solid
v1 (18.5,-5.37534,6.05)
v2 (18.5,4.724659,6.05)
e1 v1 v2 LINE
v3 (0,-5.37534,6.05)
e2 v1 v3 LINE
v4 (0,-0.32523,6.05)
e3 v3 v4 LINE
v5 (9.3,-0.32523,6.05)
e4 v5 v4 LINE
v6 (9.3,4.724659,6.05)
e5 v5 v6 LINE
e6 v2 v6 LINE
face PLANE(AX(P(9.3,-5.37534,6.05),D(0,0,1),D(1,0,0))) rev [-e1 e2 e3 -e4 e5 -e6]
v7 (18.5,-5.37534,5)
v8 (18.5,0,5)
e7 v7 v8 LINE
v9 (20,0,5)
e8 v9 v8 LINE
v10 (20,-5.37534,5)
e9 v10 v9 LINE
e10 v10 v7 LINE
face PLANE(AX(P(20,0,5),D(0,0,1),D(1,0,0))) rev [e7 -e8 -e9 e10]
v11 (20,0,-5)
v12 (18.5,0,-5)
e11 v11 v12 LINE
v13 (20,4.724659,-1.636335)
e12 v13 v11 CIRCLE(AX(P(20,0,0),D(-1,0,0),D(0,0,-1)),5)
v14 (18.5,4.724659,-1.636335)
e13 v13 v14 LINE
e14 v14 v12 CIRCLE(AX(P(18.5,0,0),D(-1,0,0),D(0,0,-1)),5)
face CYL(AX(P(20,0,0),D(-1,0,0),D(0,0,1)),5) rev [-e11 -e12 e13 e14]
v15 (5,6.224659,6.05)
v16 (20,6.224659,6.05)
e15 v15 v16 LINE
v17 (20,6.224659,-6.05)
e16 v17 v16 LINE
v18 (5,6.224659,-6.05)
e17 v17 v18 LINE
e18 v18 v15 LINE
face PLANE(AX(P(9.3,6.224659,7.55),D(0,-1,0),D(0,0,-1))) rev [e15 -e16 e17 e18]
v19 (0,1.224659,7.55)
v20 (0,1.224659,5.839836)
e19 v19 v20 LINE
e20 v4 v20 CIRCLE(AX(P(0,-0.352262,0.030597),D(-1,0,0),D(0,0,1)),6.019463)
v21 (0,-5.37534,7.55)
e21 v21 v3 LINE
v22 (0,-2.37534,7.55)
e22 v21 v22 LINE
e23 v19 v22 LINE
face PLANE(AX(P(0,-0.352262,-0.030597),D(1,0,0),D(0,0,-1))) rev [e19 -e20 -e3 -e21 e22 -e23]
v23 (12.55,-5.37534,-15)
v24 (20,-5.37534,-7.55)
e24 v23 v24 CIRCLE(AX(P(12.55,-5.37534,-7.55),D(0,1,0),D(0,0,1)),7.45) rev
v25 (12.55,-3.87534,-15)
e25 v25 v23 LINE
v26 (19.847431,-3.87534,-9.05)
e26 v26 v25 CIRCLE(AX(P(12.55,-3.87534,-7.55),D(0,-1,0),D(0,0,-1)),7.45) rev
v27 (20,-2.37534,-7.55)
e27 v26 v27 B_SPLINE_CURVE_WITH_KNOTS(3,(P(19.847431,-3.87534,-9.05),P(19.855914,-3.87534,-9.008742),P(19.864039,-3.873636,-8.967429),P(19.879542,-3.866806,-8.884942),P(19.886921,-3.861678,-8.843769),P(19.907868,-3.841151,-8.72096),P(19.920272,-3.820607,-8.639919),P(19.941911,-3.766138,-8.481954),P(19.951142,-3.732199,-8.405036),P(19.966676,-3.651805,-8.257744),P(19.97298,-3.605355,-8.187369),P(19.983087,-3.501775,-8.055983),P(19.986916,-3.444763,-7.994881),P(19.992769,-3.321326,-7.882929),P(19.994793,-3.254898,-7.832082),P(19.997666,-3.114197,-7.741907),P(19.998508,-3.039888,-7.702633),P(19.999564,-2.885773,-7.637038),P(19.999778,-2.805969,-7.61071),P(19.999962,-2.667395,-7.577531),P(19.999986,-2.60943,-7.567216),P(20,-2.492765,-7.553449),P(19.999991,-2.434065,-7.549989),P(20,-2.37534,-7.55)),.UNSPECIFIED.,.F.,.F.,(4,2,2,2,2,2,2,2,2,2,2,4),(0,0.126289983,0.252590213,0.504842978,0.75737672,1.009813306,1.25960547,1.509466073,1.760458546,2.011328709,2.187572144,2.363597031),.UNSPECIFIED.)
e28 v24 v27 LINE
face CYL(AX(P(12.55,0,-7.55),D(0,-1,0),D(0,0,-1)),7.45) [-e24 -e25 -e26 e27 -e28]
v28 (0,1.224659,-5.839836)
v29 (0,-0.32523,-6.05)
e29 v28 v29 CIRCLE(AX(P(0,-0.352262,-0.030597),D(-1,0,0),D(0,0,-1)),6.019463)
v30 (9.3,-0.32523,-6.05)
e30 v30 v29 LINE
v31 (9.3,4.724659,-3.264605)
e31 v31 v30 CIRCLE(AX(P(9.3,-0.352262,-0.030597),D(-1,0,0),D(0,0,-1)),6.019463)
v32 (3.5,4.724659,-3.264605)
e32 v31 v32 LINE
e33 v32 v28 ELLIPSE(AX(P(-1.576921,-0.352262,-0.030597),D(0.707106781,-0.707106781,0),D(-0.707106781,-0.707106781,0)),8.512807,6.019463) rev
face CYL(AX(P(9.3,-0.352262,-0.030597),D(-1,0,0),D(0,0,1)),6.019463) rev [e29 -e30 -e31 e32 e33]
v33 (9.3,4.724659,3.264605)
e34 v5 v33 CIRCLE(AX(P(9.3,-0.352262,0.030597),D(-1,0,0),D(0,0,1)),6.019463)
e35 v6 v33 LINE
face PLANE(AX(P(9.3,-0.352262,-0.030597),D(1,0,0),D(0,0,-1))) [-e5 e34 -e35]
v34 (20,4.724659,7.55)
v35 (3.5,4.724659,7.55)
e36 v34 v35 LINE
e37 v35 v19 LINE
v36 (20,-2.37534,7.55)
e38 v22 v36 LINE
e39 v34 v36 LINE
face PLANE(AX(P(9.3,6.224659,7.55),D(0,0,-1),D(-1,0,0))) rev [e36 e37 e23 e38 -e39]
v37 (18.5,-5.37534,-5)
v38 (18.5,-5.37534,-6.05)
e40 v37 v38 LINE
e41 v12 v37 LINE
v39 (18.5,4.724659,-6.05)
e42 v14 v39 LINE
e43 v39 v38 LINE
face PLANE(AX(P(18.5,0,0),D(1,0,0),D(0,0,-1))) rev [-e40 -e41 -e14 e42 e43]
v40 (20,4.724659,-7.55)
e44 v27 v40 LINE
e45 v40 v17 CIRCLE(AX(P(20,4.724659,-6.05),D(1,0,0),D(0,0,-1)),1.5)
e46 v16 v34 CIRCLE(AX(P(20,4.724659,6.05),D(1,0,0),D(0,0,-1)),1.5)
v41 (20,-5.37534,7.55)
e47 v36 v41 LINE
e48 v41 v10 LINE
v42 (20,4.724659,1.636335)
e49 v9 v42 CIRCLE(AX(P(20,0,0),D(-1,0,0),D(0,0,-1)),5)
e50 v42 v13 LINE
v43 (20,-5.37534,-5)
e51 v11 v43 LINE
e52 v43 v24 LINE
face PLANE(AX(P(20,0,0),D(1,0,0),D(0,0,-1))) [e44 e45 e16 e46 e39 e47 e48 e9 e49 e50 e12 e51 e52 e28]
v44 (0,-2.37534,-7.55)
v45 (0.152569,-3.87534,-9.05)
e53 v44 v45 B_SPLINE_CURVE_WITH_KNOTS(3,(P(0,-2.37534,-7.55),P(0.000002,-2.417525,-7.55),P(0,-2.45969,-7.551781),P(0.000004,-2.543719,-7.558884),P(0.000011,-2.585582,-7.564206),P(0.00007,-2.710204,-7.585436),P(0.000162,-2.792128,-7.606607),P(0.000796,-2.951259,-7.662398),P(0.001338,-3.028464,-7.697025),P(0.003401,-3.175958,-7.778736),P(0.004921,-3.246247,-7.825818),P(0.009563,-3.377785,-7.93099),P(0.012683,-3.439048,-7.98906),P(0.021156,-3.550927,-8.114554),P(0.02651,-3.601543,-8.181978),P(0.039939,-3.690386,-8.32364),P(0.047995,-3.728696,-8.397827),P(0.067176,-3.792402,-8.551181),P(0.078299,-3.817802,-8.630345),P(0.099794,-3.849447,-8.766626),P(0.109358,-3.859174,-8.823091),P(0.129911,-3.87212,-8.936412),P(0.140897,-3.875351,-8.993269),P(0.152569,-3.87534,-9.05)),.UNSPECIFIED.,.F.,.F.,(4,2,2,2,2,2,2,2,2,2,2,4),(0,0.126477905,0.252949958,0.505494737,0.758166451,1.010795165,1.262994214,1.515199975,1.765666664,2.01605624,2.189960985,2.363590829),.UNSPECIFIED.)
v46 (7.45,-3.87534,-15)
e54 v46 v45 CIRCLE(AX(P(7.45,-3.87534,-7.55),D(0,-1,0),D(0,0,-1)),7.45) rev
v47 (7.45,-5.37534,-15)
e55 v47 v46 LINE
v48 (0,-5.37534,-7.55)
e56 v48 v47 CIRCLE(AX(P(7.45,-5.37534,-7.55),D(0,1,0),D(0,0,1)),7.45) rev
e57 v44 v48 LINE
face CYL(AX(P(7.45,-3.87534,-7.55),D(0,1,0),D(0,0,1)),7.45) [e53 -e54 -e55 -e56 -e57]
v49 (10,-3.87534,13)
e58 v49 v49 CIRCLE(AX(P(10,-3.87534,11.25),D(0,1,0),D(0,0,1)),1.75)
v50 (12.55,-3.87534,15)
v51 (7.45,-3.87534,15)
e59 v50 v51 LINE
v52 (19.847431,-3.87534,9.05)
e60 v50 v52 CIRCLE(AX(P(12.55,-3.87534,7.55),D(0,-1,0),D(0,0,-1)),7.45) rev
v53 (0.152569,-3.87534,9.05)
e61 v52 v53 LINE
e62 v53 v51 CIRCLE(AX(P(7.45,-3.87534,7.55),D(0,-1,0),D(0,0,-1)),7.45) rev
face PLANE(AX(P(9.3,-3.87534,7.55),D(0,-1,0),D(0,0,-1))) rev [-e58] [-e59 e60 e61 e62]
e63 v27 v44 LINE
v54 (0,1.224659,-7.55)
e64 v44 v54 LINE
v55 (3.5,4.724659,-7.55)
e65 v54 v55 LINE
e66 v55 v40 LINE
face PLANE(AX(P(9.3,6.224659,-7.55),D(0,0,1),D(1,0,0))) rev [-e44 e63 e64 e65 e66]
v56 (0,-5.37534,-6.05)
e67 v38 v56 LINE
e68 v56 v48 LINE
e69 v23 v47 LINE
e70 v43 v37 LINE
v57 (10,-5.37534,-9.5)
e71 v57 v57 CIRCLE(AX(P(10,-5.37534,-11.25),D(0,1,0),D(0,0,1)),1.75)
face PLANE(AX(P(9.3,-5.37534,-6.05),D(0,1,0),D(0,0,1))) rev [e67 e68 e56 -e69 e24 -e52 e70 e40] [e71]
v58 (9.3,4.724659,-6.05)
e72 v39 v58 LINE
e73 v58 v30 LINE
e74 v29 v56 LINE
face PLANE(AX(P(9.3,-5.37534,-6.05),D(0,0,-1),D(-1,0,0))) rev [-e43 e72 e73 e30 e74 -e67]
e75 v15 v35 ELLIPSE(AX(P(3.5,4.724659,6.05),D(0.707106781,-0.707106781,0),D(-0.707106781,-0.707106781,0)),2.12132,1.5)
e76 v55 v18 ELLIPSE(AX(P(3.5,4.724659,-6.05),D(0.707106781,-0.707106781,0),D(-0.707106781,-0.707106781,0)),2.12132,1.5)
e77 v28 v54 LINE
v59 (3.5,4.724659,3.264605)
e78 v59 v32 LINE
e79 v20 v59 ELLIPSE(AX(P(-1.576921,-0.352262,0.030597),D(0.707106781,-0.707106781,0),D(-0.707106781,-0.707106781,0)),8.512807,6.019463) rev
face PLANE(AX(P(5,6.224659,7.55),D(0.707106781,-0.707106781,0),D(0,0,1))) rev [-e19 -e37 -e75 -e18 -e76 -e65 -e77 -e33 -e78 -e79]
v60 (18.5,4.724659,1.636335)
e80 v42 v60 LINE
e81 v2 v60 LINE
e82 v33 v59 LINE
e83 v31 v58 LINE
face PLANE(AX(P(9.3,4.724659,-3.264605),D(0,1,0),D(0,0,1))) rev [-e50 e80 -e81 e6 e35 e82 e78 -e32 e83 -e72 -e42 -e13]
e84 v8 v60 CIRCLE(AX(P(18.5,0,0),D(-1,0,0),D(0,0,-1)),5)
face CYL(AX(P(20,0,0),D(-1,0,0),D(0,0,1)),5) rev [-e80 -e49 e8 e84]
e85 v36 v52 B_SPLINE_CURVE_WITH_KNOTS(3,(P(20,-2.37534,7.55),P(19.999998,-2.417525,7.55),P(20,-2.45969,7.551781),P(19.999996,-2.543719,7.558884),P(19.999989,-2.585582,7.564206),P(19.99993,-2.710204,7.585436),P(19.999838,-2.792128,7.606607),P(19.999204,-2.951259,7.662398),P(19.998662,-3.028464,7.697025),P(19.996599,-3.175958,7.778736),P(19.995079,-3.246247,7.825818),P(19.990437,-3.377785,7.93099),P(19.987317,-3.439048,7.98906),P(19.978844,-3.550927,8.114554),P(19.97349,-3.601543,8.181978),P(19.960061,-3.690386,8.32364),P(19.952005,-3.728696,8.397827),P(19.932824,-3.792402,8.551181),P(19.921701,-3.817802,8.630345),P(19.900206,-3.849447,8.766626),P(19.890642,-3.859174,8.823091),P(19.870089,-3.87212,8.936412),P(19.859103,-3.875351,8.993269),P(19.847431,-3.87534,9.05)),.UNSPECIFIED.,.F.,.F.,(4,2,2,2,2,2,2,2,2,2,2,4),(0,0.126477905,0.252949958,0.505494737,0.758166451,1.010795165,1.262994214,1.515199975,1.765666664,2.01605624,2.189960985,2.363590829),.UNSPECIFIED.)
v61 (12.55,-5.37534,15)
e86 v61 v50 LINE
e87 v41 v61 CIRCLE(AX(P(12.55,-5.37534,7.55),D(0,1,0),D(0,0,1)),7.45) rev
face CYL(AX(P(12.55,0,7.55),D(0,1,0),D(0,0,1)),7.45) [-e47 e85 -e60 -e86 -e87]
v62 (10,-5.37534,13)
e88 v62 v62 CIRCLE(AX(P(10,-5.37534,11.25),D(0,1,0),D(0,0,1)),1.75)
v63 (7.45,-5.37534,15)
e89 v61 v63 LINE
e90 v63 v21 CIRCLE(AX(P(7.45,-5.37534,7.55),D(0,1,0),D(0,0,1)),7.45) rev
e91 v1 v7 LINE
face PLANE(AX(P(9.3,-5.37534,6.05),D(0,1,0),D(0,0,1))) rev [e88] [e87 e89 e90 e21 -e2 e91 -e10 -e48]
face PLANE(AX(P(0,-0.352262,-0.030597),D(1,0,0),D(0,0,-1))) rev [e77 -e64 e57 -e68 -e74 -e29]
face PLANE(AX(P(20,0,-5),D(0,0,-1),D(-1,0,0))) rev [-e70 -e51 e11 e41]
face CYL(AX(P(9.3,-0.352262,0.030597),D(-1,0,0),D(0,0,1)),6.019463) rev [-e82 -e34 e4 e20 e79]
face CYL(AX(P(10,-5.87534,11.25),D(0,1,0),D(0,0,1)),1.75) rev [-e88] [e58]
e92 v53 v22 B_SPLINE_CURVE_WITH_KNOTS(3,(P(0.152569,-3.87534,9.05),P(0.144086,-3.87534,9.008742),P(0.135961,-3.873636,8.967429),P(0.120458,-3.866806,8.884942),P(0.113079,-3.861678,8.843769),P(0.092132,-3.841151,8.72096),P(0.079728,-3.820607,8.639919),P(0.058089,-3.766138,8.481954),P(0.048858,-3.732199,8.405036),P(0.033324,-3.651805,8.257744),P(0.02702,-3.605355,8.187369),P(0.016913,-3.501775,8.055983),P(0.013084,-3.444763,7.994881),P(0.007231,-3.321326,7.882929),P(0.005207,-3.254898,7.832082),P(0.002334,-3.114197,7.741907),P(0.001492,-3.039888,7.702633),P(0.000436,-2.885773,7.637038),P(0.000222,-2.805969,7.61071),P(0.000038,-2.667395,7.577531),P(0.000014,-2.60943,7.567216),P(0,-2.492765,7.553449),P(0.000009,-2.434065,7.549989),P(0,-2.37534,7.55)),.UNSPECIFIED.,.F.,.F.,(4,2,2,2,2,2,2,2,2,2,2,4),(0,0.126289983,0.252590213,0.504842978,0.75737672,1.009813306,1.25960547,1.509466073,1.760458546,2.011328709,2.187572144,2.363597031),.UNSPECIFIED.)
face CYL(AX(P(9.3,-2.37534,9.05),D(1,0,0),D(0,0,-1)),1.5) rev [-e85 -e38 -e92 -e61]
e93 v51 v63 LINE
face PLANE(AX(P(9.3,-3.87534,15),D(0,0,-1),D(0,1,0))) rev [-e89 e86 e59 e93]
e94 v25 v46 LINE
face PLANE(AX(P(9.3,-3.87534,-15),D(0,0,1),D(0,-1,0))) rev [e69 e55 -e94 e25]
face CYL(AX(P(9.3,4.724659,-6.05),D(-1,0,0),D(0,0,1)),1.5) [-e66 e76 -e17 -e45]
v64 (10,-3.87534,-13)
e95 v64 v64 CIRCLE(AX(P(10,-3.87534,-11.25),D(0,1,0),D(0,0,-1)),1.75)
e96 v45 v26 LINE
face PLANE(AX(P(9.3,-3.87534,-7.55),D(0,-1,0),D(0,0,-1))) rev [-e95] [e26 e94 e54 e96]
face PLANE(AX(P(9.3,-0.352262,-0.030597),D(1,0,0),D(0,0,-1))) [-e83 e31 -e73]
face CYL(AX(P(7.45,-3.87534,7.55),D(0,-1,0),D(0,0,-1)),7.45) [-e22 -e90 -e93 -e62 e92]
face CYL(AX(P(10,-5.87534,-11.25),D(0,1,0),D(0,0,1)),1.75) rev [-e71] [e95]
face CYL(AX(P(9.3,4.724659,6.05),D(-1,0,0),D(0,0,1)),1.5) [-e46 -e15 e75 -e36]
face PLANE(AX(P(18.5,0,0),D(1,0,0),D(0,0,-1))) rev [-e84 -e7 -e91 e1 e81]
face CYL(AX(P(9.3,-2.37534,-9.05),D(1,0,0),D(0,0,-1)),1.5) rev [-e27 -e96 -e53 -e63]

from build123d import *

# Parameters (mm, degrees)
BOSS_EXTRUDE1_DEPTH = 9.3
BOSS_EXTRUDE2_DEPTH = 9.2
BOSS_EXTRUDE3_DEPTH = 1.5
SKETCH4_R           = 1.75
CUT_EXTRUDE4_DEPTH  = 2
FILLET4_R           = 7.45
FILLET5_R           = 1.5
CHAMFER2_START      = -5
CHAMFER2_OUTLINE_W  = 10
CHAMFER2_OUTLINE_H  = 15.1
CHAMFER2_DEPTH      = 4.134035023


with BuildPart() as part:
    # Sketch3 → Boss-Extrude1 (new body)
    with BuildSketch(Plane(origin=(0, 0, 0), x_dir=(0, 0, -1), z_dir=(1, 0, 0))):
        with BuildLine():
            Line((-6.05, -5.375339764), (-6.05, -0.325229596))
            ThreePointArc((-6.05, -0.325229596), (-5.30143663, 2.555003374), (-3.26460533, 4.724659415))
            Line((-3.26460533, 4.724659415), (3.26460533, 4.724659415))
            ThreePointArc((3.26460533, 4.724659415), (5.30143663, 2.555003374), (6.05, -0.325229596))
            Line((6.05, -0.325229596), (6.05, -5.375339764))
            Line((6.05, -5.375339764), (15, -5.375339764))
            Line((15, -5.375339764), (15, -3.875339764))
            Line((15, -3.875339764), (7.55, -3.875339764))
            Line((7.55, -3.875339764), (7.55, 6.224659415))
            Line((7.55, 6.224659415), (-7.55, 6.224659415))
            Line((-7.55, 6.224659415), (-7.55, -3.875339764))
            Line((-7.55, -3.875339764), (-15, -3.875339764))
            Line((-15, -3.875339764), (-15, -5.375339764))
            Line((-15, -5.375339764), (-6.05, -5.375339764))
        make_face()
    extrude(amount=BOSS_EXTRUDE1_DEPTH)

    # Sketch9 → Boss-Extrude2 (add)
    with BuildSketch(Plane(origin=(9.3, 0, 0), x_dir=(0, 0, -1), z_dir=(1, 0, 0))):
        Polygon((7.55, -3.875339764), (7.55, 6.224659415), (-7.55, 6.224659415), (-7.55, -3.875339764), (-15, -3.875339764), (-15, -5.375339764), (-6.05, -5.375339764), (-6.05, 4.724659415), (6.05, 4.724659415), (6.05, -5.375339764), (15, -5.375339764), (15, -3.875339764), align=None)
    extrude(amount=BOSS_EXTRUDE2_DEPTH)

    # Sketch11 → Boss-Extrude3 (add)
    with BuildSketch(Plane(origin=(18.5, 0, 0), x_dir=(0, 0, -1), z_dir=(1, 0, 0))):
        with BuildLine():
            Line((-5, 0), (-5, -5.375339764))
            Line((-5, -5.375339764), (-15, -5.375339764))
            Line((-15, -5.375339764), (-15, -3.875339764))
            Line((-15, -3.875339764), (-7.55, -3.875339764))
            Line((-7.55, -3.875339764), (-7.55, 6.224659415))
            Line((-7.55, 6.224659415), (7.55, 6.224659415))
            Line((7.55, 6.224659415), (7.55, -3.875339764))
            Line((7.55, -3.875339764), (15, -3.875339764))
            Line((15, -3.875339764), (15, -5.375339764))
            Line((15, -5.375339764), (5, -5.375339764))
            Line((5, -5.375339764), (5, 0))
            ThreePointArc((5, 0), (4.07318529, 2.899855444), (1.636335361, 4.724659415))
            Line((1.636335361, 4.724659415), (-1.636335361, 4.724659415))
            ThreePointArc((-1.636335361, 4.724659415), (-4.07318529, 2.899855444), (-5, 0))
        make_face()
    extrude(amount=BOSS_EXTRUDE3_DEPTH)

    # Sketch4 → Cut-Extrude4 (cut)
    with BuildSketch(Plane(origin=(0, -3.875339764, 0), x_dir=(1, 0, 0), z_dir=(0, 1, 0))):
        with Locations(Location((10, -11.25, 0), (0, 0, 270))):
            Circle(SKETCH4_R)
        with Locations(Location((10, 11.25, 0), (0, 0, 270))):
            Circle(SKETCH4_R)
    extrude(amount=-CUT_EXTRUDE4_DEPTH, mode=Mode.SUBTRACT)

    # Fillet4
    fillet4_edges = [part.edges().sort_by_distance(p)[0] for p in [
        (0, -4.625339764, -15),
        (20, -4.625339764, -15),
        (20, -4.625339764, 15),
        (0, -4.625339764, 15),
    ]]
    fillet(fillet4_edges, radius=FILLET4_R)

    # Fillet5
    # the kernel refuses this fillet: 1.5 mm, written as the material it adds along each edge
    with BuildSketch(Plane(origin=(-3.75, -3.875339764, 7.55), x_dir=(0, 0, 1), z_dir=(1, 0, 0))) as fillet5_piece_1_section:
        with BuildLine():
            CenterArc((FILLET5_R, -FILLET5_R), FILLET5_R, 90, 90)
            Line((0, -FILLET5_R), (0, 0))
            Line((0, 0), (FILLET5_R, 0))
        make_face()
    fillet5_piece_1 = extrude(amount=27.5, mode=Mode.PRIVATE)
    fillet5_piece_1 = fillet5_piece_1 & Plane(origin=(7.45, -3.875339764, 7.55), x_dir=(-1, 0, 0), z_dir=(0, -1, 0)) * Cylinder(7.45, 61, mode=Mode.PRIVATE)
    add(fillet5_piece_1)
    with BuildSketch(Plane(origin=(-3.75, -3.875339764, 7.55), x_dir=(0, 0, 1), z_dir=(1, 0, 0))) as fillet5_piece_2_section:
        with BuildLine():
            CenterArc((FILLET5_R, -FILLET5_R), FILLET5_R, 90, 90)
            Line((0, -FILLET5_R), (0, 0))
            Line((0, 0), (FILLET5_R, 0))
        make_face()
    fillet5_piece_2 = extrude(amount=27.5, mode=Mode.PRIVATE)
    fillet5_piece_2 = fillet5_piece_2 & Plane(origin=(12.55, -3.875339764, 7.55), x_dir=(0, 0, 1), z_dir=(0, 1, 0)) * Cylinder(7.45, 61, mode=Mode.PRIVATE)
    add(fillet5_piece_2)
    with BuildSketch(Plane(origin=(-3.75, -3.875339764, -7.55), x_dir=(0, 1, 0), z_dir=(1, 0, 0))) as fillet5_piece_3_section:
        with BuildLine():
            CenterArc((FILLET5_R, -FILLET5_R), FILLET5_R, 90, 90)
            Line((0, -FILLET5_R), (0, 0))
            Line((0, 0), (FILLET5_R, 0))
        make_face()
    fillet5_piece_3 = extrude(amount=27.5, mode=Mode.PRIVATE)
    fillet5_piece_3 = fillet5_piece_3 & Plane(origin=(7.45, -3.875339764, -7.55), x_dir=(-1, 0, 0), z_dir=(0, 1, 0)) * Cylinder(7.45, 62, mode=Mode.PRIVATE)
    add(fillet5_piece_3)
    with BuildSketch(Plane(origin=(-3.75, -3.875339764, -7.55), x_dir=(0, 1, 0), z_dir=(1, 0, 0))) as fillet5_piece_4_section:
        with BuildLine():
            CenterArc((FILLET5_R, -FILLET5_R), FILLET5_R, 90, 90)
            Line((0, -FILLET5_R), (0, 0))
            Line((0, 0), (FILLET5_R, 0))
        make_face()
    fillet5_piece_4 = extrude(amount=27.5, mode=Mode.PRIVATE)
    fillet5_piece_4 = fillet5_piece_4 & Plane(origin=(12.55, -3.875339764, -7.55), x_dir=(1, 0, 0), z_dir=(0, -1, 0)) * Cylinder(7.45, 62, mode=Mode.PRIVATE)
    add(fillet5_piece_4)
    # the kernel refuses this fillet: 1.5 mm, written as the material it takes off along each edge
    with BuildSketch(Plane(origin=(-3.75, 6.224659415, 7.55), x_dir=(0, -1, 0), z_dir=(1, 0, 0)), Plane(origin=(-3.75, 6.224659415, -7.55), x_dir=(0, 0, 1), z_dir=(1, 0, 0))) as fillet5_2_piece_1:
        with BuildLine():
            CenterArc((FILLET5_R, FILLET5_R), FILLET5_R, 180, 90)
            Line((0, FILLET5_R), (0, 0))
            Line((0, 0), (FILLET5_R, 0))
        make_face()
    extrude(amount=27.5, mode=Mode.SUBTRACT)

    # Chamfer2: read off the stored shape, not the designer's step
    # Chamfer2 outline → Chamfer2 (cut)
    with BuildSketch(Plane(origin=(0, 0, 0), x_dir=(0.7071067811865474, 0.7071067811865477, 0), z_dir=(0.7071067811865476, -0.7071067811865476, 0)).offset(CHAMFER2_START)):
        with Locations((4, 0)):
            Rectangle(CHAMFER2_OUTLINE_W, CHAMFER2_OUTLINE_H)
    extrude(amount=CHAMFER2_DEPTH, mode=Mode.SUBTRACT)


solid = part.part
